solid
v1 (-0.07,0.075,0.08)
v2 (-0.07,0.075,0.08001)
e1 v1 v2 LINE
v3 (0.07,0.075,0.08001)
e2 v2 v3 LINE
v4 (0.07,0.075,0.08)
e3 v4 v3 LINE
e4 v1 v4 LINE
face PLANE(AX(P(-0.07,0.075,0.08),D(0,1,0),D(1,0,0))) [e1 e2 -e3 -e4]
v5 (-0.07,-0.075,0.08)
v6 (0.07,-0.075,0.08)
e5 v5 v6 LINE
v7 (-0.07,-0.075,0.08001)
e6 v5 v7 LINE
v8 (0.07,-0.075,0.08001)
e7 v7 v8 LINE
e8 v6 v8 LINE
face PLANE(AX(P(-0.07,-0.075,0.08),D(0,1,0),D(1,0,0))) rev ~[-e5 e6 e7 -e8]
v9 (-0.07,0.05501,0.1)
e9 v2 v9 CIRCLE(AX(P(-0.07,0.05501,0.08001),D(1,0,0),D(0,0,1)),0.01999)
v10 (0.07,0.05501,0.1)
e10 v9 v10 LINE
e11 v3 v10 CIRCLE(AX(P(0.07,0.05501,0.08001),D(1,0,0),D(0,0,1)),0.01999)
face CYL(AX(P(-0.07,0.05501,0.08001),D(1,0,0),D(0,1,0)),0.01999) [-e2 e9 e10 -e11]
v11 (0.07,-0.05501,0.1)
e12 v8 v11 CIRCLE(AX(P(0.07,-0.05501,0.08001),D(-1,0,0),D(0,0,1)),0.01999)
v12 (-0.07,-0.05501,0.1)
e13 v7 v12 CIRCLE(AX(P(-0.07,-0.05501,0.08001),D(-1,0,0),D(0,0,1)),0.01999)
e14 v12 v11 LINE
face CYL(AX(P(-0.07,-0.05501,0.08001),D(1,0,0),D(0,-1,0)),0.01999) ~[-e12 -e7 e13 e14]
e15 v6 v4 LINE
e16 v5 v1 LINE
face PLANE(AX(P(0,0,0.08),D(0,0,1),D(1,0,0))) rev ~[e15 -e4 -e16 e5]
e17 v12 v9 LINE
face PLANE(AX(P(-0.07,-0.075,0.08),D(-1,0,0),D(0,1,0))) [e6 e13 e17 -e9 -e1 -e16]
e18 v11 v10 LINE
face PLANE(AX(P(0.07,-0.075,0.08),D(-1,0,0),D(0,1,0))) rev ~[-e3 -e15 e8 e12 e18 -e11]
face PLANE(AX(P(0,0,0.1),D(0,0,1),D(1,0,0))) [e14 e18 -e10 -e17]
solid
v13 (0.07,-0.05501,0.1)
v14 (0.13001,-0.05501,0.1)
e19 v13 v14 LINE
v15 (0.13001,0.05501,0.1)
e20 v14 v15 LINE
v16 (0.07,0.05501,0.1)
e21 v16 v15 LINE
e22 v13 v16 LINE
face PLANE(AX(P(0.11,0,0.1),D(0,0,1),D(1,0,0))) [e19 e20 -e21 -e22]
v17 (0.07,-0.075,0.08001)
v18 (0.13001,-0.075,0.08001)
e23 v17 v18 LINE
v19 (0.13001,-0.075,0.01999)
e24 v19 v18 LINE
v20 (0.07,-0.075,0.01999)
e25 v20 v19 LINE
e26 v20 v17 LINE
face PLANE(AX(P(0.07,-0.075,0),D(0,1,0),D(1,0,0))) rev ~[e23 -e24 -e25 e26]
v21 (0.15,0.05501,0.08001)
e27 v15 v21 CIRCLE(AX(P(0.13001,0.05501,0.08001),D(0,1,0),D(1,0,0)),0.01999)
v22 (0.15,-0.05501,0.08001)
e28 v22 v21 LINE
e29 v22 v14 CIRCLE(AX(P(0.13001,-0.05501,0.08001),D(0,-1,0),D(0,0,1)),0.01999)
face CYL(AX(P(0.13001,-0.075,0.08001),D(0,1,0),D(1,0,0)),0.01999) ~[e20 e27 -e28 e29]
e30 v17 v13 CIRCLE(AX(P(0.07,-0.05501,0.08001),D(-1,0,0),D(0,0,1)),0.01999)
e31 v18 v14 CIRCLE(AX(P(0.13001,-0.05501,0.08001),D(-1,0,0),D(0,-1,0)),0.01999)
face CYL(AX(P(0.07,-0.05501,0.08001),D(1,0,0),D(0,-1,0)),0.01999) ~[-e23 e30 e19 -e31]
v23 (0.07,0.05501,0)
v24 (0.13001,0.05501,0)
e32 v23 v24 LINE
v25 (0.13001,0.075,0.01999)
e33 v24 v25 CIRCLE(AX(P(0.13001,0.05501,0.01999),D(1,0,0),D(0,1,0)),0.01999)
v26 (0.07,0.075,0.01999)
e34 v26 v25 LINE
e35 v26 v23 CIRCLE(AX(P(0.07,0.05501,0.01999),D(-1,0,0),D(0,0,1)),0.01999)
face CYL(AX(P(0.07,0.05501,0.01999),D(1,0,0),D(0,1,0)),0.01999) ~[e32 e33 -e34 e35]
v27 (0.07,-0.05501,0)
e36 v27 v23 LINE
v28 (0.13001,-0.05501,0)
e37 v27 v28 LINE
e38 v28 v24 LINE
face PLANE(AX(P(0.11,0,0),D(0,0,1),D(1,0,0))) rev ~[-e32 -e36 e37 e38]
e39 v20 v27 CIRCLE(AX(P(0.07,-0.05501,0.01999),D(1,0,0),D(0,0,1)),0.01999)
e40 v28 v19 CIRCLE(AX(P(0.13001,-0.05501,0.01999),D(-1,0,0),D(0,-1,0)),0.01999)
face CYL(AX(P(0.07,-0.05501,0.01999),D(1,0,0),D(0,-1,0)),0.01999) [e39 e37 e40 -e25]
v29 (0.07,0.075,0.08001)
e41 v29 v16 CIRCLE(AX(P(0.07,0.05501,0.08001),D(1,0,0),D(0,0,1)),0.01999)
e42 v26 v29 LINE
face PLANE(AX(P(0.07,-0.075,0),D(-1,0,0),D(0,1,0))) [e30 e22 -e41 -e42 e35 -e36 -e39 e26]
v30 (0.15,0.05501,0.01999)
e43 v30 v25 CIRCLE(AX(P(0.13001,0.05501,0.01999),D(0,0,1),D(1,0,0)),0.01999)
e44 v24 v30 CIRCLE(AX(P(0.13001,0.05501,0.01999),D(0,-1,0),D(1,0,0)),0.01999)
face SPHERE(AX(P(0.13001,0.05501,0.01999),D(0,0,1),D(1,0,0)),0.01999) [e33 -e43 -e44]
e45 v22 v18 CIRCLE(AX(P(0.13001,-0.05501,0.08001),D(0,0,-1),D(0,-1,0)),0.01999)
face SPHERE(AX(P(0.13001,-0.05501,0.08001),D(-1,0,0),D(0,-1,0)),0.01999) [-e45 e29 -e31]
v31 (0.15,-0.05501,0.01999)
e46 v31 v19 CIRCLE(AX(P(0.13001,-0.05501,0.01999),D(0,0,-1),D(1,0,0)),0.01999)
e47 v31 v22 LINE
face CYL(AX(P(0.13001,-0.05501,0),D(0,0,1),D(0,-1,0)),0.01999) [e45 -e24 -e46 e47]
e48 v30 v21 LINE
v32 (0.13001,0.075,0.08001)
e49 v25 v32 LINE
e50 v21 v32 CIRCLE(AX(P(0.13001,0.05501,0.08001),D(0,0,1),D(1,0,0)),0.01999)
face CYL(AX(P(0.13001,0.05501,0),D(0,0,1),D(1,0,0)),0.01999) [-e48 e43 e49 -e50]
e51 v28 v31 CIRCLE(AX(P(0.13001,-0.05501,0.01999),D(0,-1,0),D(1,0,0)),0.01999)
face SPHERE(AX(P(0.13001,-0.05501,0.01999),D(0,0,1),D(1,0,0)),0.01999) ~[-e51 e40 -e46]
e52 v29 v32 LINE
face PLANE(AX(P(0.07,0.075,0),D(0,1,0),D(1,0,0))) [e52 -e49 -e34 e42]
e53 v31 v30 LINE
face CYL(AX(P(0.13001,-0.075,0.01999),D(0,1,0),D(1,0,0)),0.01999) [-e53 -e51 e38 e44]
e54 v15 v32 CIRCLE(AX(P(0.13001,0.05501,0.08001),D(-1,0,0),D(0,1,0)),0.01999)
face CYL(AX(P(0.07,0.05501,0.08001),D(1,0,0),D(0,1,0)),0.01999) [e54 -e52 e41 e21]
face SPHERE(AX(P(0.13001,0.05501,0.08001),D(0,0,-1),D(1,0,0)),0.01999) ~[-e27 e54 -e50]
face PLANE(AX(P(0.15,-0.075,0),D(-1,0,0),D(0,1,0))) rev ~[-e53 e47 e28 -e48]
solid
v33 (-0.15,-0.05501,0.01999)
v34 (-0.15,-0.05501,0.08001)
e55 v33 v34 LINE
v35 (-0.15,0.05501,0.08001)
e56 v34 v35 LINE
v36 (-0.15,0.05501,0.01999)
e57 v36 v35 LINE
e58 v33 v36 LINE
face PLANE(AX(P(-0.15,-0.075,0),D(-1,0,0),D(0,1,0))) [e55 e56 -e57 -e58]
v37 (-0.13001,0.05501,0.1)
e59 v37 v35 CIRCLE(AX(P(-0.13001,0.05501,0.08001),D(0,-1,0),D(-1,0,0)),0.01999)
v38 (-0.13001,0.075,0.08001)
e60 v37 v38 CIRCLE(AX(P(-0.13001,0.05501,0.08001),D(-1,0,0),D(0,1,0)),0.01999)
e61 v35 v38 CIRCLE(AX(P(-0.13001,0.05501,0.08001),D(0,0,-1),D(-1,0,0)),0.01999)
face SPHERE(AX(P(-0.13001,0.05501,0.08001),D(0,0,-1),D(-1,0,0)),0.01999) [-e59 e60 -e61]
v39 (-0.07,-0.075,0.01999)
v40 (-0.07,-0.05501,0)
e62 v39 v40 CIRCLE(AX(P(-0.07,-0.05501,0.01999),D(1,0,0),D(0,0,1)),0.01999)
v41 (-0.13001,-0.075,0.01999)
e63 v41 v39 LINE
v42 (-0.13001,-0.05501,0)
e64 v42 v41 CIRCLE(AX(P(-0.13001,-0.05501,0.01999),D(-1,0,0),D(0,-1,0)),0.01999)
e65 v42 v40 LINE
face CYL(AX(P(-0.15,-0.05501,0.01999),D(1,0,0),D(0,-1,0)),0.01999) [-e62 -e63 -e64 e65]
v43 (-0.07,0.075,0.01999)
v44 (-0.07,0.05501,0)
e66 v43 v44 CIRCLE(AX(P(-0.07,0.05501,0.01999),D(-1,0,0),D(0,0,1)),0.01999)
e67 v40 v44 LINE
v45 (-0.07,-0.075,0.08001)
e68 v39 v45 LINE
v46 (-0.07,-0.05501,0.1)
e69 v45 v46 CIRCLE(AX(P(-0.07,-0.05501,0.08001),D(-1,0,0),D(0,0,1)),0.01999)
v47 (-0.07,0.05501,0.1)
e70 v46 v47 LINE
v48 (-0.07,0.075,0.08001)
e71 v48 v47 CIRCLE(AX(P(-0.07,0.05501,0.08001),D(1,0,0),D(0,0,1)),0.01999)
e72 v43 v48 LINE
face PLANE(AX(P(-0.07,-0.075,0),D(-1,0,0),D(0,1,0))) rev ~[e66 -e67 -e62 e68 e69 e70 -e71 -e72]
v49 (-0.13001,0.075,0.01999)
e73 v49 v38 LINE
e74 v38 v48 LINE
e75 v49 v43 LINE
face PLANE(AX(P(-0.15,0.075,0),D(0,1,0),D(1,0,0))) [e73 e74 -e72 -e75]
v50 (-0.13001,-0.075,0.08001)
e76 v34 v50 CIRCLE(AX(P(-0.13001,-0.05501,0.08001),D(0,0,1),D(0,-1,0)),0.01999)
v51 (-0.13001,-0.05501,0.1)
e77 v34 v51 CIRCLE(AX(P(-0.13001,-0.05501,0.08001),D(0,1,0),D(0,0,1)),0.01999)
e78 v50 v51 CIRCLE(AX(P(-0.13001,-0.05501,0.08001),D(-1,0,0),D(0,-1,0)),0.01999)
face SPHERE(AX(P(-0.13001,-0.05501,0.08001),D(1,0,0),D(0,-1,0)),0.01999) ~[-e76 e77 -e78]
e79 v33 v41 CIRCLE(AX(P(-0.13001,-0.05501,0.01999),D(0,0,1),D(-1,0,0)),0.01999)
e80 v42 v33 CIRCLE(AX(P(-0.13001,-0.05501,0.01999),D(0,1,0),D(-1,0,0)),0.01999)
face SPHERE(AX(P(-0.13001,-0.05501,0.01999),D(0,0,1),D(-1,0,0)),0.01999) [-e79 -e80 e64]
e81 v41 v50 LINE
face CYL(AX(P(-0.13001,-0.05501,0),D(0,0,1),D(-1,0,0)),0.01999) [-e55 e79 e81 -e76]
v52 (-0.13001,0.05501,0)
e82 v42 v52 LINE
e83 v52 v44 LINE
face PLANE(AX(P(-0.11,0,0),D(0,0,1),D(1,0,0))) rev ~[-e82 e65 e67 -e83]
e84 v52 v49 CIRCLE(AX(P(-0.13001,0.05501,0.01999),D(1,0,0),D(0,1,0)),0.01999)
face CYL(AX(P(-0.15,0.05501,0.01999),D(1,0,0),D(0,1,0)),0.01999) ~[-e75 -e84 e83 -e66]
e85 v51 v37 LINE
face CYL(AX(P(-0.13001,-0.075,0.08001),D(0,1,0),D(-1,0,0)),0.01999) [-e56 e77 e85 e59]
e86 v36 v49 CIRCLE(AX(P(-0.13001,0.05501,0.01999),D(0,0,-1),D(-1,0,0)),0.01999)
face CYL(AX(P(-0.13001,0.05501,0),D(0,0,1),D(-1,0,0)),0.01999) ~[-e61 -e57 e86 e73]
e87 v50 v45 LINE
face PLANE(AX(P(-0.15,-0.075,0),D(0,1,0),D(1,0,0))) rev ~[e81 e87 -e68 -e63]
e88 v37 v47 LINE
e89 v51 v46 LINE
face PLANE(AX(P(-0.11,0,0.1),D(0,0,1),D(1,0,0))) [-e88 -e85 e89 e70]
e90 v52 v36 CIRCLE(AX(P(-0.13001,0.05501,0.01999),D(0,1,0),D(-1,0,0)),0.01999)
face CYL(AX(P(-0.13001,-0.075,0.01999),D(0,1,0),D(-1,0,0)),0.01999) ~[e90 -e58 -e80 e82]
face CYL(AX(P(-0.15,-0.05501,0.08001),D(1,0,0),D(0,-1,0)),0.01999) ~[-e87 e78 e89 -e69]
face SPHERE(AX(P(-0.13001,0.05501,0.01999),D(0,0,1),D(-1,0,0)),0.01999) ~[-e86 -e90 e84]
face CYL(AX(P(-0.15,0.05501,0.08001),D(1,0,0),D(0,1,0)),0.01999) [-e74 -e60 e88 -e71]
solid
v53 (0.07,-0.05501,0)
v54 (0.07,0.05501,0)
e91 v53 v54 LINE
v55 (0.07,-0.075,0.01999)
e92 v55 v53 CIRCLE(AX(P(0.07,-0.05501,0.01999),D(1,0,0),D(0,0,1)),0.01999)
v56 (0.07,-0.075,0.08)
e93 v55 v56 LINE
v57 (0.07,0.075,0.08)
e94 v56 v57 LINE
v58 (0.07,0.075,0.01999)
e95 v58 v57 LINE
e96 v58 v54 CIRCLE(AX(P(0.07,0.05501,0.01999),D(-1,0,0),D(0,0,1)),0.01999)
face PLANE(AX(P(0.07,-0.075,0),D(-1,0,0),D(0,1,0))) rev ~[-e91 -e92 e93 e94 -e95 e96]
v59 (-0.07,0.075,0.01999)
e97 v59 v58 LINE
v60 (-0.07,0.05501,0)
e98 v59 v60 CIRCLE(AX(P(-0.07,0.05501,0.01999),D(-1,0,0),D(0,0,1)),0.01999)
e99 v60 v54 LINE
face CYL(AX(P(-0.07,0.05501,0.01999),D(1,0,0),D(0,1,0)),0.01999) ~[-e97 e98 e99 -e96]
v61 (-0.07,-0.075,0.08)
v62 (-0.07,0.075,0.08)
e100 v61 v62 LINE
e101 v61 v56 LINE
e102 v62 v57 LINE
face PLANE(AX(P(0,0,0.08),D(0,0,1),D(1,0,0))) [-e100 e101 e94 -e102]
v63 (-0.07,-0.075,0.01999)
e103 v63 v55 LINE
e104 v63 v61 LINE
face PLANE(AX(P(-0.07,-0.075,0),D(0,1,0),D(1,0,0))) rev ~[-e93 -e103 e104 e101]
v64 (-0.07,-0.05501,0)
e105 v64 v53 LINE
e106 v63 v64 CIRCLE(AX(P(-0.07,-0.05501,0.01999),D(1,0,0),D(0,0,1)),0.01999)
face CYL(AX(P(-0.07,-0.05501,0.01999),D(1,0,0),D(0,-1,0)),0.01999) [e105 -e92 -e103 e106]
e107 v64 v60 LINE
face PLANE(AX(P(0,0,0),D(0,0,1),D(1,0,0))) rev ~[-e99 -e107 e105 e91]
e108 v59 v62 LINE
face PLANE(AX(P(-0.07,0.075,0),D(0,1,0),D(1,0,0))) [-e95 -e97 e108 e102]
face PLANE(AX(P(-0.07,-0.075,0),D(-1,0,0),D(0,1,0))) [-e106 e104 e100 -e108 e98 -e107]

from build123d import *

# Parameters (mm, degrees)
F2_W     = 0.14
F2_H     = 0.15
F3_DEPTH = 0.08
F2_W_2   = 0.08
F4_DEPTH = 0.1
F5_DEPTH = 0.1
F6_DEPTH = 0.02
F7_R     = 0.01999
F7_2_R   = 0.01999
F7_3_R   = 0.01999
F7_4_R   = 0.01999


# Not quite as in the source:
# - a fillet or chamfer is up to 0.001 mm smaller than in the source, because OpenCascade refuses the exact size


with BuildPart() as f3:
    # F2 (on Top) → F3 (new body)
    with BuildSketch(Plane.XY):
        Rectangle(F2_W, F2_H)
    extrude(amount=F3_DEPTH)


with BuildPart() as f4:
    # F2 (on Top) → F4 (new body)
    with BuildSketch(Plane.XY):
        with Locations((-0.11, 0)):
            Rectangle(F2_W_2, F2_H)
    extrude(amount=F4_DEPTH)

    # F7 (radius 0.02 in the source; OpenCascade refuses exactly that, so slightly less here)
    f7_edges = [f4.edges().sort_by_distance(p)[0] for p in [
        (-0.11, -0.075, 0.1),
        (-0.15, 0.075, 0.05),
        (-0.15, -0.075, 0.05),
        (-0.15, 0, 0),
        (-0.15, 0, 0.1),
        (-0.11, 0.075, 0.1),
        (-0.11, 0.075, 0),
        (-0.11, -0.075, 0),
    ]]
    fillet(f7_edges, radius=F7_R)


with BuildPart() as f5:
    # F2 (on Top) → F5 (new body)
    with BuildSketch(Plane.XY):
        with Locations((0.11, 0)):
            Rectangle(F2_W_2, F2_H)
    extrude(amount=F5_DEPTH)

    # F7#2 (radius 0.02 in the source; OpenCascade refuses exactly that, so slightly less here)
    f7_2_edges = [f5.edges().sort_by_distance(p)[0] for p in [
        (0.11, -0.075, 0.1),
        (0.15, -0.075, 0.05),
        (0.15, 0.075, 0.05),
        (0.15, 0, 0),
        (0.15, 0, 0.1),
        (0.11, 0.075, 0.1),
        (0.11, 0.075, 0),
        (0.11, -0.075, 0),
    ]]
    fillet(f7_2_edges, radius=F7_2_R)


with BuildPart() as f6:
    # F6 (new): a face of the model
    f6_faces = [f3.part.faces().sort_by_distance(p)[0] for p in [
        (0, 0, 0.08),
    ]]
    extrude(f6_faces, amount=F6_DEPTH)

    # F7#4 (radius 0.02 in the source; OpenCascade refuses exactly that, so slightly less here)
    f7_4_edges = [f6.edges().sort_by_distance(p)[0] for p in [
        (0, -0.075, 0.1),
        (0, 0.075, 0.1),
    ]]
    fillet(f7_4_edges, radius=F7_4_R)


with BuildPart() as f3_1:
    add(f3.part)

    # F7#3 (radius 0.02 in the source; OpenCascade refuses exactly that, so slightly less here)
    f7_3_edges = [f3_1.edges().sort_by_distance(p)[0] for p in [
        (0, 0.075, 0),
        (0, -0.075, 0),
    ]]
    fillet(f7_3_edges, radius=F7_3_R)


solid = Compound([f4.part, f5.part, f6.part, f3_1.part])
